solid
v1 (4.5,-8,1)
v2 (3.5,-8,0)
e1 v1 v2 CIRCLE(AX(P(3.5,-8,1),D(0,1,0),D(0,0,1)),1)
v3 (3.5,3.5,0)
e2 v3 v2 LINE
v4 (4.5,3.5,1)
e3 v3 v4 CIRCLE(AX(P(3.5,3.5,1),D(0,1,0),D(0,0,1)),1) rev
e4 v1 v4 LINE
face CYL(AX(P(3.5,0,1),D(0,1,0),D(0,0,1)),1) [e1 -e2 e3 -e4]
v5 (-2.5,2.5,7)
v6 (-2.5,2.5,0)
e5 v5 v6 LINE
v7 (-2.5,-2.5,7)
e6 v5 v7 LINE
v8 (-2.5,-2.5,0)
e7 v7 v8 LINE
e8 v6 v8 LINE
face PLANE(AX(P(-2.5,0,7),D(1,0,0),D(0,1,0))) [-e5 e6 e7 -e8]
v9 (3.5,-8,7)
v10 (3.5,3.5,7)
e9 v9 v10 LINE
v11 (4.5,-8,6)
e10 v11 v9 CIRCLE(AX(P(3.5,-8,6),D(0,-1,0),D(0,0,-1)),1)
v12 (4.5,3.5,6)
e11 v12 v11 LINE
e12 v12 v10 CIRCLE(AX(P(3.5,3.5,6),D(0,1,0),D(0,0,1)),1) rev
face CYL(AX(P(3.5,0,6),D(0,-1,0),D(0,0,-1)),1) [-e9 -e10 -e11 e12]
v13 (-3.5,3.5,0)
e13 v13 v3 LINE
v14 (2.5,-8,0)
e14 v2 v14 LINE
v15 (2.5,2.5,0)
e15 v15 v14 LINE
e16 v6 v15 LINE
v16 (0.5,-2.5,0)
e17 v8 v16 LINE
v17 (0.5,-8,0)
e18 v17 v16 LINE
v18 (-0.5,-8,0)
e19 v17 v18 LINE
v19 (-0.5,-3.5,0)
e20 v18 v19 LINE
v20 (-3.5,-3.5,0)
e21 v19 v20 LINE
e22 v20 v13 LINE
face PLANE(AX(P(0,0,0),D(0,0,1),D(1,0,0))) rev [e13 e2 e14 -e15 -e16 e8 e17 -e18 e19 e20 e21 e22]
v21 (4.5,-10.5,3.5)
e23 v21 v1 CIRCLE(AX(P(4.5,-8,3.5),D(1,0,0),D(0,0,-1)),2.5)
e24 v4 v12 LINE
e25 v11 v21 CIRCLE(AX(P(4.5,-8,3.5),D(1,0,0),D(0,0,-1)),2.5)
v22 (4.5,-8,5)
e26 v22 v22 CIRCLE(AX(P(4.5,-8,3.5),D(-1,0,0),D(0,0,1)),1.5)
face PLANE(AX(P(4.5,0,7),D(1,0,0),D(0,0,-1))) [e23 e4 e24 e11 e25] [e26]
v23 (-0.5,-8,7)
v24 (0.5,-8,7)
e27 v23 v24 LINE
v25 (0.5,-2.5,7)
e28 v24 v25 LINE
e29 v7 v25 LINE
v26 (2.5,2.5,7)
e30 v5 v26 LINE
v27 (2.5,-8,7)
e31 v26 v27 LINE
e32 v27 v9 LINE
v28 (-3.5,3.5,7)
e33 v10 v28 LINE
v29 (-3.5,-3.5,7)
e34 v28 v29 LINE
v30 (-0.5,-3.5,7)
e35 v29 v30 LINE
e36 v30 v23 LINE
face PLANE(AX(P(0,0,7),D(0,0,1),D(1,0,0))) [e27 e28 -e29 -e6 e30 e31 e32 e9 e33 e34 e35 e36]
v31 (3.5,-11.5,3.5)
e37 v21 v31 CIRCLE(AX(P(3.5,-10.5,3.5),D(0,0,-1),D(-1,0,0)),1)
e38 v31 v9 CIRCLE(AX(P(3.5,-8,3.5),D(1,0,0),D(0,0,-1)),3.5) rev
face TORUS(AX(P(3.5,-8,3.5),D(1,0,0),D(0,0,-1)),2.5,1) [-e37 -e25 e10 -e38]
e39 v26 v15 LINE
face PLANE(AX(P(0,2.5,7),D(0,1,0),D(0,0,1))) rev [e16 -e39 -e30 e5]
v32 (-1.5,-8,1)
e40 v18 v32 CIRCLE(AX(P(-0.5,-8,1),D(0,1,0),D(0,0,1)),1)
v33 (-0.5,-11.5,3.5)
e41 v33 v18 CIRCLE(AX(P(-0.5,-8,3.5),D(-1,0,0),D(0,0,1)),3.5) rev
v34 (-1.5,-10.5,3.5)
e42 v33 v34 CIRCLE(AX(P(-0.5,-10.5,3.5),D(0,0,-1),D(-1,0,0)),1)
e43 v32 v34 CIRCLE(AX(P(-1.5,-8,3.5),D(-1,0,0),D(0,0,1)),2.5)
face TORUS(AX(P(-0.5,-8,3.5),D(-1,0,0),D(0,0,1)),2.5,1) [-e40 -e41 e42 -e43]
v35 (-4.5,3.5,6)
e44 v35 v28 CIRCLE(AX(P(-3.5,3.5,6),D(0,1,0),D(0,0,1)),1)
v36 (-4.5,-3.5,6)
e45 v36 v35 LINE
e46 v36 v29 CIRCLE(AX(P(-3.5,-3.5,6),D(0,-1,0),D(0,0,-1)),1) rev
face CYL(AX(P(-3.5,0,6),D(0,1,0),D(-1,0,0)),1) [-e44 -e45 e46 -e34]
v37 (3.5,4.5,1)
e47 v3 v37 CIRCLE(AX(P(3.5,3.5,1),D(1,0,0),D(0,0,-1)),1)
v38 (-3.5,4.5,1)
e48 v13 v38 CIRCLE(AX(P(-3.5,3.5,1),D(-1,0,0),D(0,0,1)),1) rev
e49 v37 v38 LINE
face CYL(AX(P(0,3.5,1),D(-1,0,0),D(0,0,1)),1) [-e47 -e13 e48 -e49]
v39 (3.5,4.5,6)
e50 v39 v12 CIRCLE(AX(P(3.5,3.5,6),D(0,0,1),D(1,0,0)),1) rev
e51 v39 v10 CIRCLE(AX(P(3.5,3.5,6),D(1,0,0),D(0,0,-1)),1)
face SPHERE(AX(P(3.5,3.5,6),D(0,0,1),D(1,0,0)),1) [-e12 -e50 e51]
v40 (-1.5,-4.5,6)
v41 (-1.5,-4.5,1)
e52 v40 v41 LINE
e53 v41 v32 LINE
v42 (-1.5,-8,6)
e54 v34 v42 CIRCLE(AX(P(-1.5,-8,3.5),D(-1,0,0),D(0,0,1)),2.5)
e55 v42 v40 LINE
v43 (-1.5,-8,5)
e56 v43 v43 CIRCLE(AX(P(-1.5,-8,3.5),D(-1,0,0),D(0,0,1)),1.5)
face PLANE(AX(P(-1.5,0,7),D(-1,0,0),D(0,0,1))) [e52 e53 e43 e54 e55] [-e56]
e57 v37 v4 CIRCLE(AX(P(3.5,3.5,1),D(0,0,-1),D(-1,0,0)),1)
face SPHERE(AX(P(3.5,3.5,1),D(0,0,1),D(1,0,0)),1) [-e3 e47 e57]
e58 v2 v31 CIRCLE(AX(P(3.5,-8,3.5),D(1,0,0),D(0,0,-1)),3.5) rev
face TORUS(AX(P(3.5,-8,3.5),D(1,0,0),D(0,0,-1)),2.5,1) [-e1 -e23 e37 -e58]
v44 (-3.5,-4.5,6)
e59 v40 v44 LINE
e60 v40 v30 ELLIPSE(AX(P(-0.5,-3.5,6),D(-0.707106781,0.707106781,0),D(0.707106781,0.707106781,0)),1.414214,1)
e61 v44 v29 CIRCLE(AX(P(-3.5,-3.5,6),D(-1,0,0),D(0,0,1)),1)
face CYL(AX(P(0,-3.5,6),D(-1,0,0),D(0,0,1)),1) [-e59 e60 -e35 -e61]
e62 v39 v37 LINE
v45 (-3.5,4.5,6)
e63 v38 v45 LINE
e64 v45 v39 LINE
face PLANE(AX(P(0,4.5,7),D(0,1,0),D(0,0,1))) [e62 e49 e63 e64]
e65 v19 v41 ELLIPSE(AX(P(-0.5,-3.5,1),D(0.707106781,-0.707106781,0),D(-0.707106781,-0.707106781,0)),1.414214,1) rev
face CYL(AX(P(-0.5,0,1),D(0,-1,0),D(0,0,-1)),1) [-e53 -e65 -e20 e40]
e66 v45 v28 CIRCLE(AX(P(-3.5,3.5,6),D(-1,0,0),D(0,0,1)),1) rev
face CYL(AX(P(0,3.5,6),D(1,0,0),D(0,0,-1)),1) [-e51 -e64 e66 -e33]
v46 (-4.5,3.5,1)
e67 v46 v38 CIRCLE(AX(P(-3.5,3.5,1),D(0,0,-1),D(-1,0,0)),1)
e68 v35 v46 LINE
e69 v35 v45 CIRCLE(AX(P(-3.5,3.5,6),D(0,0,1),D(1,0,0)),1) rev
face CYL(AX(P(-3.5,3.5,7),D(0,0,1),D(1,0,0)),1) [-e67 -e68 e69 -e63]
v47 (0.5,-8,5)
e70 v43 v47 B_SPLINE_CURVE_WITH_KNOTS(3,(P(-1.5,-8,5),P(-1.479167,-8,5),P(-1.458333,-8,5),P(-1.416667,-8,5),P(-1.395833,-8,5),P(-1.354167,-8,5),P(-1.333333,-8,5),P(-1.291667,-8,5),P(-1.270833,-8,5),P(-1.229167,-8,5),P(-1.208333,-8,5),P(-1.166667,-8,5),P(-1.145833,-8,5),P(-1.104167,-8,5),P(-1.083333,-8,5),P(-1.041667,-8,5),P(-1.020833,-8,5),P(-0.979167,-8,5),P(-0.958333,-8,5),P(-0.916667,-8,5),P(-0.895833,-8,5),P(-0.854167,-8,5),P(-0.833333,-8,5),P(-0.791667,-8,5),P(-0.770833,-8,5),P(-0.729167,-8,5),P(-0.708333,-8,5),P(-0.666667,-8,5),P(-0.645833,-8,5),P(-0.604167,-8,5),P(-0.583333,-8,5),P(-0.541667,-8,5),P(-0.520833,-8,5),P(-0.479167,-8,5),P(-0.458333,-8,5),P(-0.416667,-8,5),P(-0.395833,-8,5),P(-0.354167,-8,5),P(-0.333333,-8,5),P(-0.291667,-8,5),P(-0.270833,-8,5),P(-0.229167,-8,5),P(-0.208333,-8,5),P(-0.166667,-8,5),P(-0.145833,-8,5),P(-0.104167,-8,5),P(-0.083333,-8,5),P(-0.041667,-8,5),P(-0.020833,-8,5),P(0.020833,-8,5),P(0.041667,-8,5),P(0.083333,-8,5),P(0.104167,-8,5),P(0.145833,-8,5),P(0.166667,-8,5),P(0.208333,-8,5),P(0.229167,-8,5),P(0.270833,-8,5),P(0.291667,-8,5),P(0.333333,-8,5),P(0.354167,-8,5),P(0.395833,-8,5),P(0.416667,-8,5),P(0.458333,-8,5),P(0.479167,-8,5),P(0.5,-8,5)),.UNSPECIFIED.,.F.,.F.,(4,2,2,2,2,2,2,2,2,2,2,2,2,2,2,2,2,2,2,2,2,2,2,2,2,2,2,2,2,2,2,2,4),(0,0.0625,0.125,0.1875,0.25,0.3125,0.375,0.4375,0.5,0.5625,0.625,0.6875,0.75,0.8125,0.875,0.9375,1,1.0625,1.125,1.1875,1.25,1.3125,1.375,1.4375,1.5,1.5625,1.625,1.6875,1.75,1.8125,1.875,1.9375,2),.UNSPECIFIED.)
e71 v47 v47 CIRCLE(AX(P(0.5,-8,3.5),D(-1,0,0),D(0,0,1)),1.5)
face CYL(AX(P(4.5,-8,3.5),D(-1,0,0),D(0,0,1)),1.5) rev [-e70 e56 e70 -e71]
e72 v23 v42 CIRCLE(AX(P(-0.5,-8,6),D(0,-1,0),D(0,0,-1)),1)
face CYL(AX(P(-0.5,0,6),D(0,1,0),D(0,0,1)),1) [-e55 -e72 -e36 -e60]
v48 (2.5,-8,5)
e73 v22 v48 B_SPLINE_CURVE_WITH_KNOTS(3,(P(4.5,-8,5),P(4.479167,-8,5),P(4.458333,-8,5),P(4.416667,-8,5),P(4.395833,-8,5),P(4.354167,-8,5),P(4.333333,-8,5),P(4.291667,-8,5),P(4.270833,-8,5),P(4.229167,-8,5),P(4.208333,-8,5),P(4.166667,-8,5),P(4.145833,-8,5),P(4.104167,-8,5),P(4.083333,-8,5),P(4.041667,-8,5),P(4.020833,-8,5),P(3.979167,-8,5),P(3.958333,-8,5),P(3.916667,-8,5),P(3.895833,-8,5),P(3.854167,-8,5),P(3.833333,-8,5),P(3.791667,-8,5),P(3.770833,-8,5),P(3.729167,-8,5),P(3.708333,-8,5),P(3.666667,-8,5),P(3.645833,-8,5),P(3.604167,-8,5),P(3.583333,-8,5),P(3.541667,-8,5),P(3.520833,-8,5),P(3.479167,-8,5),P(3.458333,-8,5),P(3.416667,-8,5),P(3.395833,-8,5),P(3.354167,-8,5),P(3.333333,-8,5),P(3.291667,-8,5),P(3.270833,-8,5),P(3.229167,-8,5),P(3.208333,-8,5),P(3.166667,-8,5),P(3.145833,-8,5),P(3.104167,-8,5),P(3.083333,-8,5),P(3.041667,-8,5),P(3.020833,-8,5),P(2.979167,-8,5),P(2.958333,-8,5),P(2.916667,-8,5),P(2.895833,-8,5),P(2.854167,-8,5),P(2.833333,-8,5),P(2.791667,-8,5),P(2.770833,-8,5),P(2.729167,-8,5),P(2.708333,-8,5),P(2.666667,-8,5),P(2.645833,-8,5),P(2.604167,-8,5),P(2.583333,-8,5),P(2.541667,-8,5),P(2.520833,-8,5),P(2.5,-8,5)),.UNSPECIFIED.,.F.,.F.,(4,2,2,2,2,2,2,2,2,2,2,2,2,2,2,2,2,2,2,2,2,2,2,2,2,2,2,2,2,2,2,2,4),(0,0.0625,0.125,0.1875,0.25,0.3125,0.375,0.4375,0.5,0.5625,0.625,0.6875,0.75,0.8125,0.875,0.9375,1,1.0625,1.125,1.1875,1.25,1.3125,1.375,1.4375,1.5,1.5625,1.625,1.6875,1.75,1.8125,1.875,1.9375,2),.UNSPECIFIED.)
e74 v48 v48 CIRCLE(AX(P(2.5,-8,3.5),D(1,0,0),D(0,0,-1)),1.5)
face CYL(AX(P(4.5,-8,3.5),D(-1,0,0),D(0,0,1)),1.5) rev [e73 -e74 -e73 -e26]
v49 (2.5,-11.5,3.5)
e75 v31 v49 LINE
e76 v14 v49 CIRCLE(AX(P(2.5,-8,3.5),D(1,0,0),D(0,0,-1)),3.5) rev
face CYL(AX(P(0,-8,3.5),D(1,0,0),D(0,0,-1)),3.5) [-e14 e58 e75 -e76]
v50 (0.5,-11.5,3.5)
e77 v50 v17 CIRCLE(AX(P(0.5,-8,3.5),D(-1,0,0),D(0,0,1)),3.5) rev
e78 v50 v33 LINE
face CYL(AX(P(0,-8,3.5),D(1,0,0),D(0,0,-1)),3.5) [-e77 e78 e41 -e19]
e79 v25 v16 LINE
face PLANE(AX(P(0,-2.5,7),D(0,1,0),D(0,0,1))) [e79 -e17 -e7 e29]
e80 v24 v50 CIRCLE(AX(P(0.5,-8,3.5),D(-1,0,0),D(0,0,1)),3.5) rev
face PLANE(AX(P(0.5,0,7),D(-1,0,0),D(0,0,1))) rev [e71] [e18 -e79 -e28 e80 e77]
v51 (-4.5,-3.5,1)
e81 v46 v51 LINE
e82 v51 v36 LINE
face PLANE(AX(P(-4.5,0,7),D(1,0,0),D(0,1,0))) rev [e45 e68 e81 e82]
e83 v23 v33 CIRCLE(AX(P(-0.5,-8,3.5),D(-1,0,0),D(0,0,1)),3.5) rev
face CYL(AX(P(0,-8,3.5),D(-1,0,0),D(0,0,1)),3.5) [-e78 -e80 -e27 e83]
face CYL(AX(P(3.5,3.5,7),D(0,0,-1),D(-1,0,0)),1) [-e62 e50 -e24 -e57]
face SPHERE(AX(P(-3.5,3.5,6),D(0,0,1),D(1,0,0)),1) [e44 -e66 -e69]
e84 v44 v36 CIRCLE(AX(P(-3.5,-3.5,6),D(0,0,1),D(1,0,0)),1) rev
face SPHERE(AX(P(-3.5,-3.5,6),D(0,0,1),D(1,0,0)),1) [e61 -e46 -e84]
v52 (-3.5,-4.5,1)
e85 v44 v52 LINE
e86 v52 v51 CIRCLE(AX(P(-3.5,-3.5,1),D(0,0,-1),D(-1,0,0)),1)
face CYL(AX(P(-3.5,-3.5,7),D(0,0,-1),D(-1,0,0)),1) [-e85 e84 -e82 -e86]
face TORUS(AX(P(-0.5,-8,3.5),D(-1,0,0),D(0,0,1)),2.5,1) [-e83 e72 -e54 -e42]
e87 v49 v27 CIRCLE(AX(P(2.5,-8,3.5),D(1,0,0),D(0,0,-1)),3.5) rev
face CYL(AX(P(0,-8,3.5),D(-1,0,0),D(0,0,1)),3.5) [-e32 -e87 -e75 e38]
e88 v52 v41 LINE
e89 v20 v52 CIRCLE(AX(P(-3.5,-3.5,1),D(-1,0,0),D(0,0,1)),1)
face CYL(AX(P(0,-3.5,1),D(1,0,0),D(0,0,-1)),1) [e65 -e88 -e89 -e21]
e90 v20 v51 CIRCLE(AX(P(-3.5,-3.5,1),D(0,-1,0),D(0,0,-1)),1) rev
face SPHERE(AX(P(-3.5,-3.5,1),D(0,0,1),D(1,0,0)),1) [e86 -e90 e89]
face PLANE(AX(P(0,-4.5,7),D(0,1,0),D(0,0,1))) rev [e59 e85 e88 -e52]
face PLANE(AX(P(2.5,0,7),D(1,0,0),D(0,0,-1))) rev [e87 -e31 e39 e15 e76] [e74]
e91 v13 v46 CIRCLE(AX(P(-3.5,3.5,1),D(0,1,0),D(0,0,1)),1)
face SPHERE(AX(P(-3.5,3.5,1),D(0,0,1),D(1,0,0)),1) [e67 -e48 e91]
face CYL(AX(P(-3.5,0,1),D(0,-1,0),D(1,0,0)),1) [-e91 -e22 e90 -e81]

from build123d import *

# Parameters (mm, degrees)
SKETCH_1_W          = 2
SKETCH_1_H          = 7
EXTRUDE_2_DEPTH     = 7
FILLET_4_R          = 3.5
SKETCH_3_R          = 1.5
CUT_EXTRUDE_2_DEPTH = 15.739402973
FILLET_5_R          = 1


with BuildPart() as part:
    # 草图1 → 凸台-拉伸2 (new body)
    with BuildSketch(Plane.XY):
        Polygon((-2.5, -2.5), (-2.5, 2.5), (2.5, 2.5), (2.5, -2.5), (2.5, -4.5), (4.5, -4.5), (4.5, 4.5), (-4.5, 4.5), (-4.5, -4.5), (-1.5, -4.5), (0.5, -4.5), (0.5, -2.5), align=None)
        with Locations((-0.5, -8)):
            Rectangle(SKETCH_1_W, SKETCH_1_H)
        with Locations((3.5, -8)):
            Rectangle(SKETCH_1_W, SKETCH_1_H)
    extrude(amount=EXTRUDE_2_DEPTH)

    # 圆角4
    fillet_4_edges = [part.edges().sort_by_distance(p)[0] for p in [
        (3.5, -11.5, 0),
        (3.5, -11.5, 7),
        (-0.5, -11.5, 0),
        (-0.5, -11.5, 7),
    ]]
    fillet(fillet_4_edges, radius=FILLET_4_R - 0.0001)  # a hair under: the kernel refuses the full size

    # 草图3 → 切除-拉伸2 (cut, through all)
    with BuildSketch(Plane.ZY.offset(1.5)):
        with Locations((3.5, -8)):
            Circle(SKETCH_3_R)
    extrude(amount=-CUT_EXTRUDE_2_DEPTH, mode=Mode.SUBTRACT)

    # 圆角5
    fillet_5_edges = [part.edges().sort_by_distance(p)[0] for p in [
        (-4.5, 0, 0),
        (0, 4.5, 0),
        (4.5, -1.75005, 0),
        (-3, -4.5, 0),
        (-4.5, -4.5, 3.5),
        (-4.5, 4.5, 3.5),
        (4.5, 4.5, 3.5),
        (-3, -4.5, 7),
        (-1.5, -6.25005, 0),
        (4.5, -1.75005, 7),
        (4.5, -10.474903023, 5.974903023),
        (4.5, -10.474903023, 1.025096977),
        (-1.5, -6.25005, 7),
        (-1.5, -10.474903023, 5.974903023),
        (-1.5, -10.474903023, 1.025096977),
        (0, 4.5, 7),
        (-4.5, 0, 7),
    ]]
    fillet(fillet_5_edges, radius=FILLET_5_R)


solid = part.part
